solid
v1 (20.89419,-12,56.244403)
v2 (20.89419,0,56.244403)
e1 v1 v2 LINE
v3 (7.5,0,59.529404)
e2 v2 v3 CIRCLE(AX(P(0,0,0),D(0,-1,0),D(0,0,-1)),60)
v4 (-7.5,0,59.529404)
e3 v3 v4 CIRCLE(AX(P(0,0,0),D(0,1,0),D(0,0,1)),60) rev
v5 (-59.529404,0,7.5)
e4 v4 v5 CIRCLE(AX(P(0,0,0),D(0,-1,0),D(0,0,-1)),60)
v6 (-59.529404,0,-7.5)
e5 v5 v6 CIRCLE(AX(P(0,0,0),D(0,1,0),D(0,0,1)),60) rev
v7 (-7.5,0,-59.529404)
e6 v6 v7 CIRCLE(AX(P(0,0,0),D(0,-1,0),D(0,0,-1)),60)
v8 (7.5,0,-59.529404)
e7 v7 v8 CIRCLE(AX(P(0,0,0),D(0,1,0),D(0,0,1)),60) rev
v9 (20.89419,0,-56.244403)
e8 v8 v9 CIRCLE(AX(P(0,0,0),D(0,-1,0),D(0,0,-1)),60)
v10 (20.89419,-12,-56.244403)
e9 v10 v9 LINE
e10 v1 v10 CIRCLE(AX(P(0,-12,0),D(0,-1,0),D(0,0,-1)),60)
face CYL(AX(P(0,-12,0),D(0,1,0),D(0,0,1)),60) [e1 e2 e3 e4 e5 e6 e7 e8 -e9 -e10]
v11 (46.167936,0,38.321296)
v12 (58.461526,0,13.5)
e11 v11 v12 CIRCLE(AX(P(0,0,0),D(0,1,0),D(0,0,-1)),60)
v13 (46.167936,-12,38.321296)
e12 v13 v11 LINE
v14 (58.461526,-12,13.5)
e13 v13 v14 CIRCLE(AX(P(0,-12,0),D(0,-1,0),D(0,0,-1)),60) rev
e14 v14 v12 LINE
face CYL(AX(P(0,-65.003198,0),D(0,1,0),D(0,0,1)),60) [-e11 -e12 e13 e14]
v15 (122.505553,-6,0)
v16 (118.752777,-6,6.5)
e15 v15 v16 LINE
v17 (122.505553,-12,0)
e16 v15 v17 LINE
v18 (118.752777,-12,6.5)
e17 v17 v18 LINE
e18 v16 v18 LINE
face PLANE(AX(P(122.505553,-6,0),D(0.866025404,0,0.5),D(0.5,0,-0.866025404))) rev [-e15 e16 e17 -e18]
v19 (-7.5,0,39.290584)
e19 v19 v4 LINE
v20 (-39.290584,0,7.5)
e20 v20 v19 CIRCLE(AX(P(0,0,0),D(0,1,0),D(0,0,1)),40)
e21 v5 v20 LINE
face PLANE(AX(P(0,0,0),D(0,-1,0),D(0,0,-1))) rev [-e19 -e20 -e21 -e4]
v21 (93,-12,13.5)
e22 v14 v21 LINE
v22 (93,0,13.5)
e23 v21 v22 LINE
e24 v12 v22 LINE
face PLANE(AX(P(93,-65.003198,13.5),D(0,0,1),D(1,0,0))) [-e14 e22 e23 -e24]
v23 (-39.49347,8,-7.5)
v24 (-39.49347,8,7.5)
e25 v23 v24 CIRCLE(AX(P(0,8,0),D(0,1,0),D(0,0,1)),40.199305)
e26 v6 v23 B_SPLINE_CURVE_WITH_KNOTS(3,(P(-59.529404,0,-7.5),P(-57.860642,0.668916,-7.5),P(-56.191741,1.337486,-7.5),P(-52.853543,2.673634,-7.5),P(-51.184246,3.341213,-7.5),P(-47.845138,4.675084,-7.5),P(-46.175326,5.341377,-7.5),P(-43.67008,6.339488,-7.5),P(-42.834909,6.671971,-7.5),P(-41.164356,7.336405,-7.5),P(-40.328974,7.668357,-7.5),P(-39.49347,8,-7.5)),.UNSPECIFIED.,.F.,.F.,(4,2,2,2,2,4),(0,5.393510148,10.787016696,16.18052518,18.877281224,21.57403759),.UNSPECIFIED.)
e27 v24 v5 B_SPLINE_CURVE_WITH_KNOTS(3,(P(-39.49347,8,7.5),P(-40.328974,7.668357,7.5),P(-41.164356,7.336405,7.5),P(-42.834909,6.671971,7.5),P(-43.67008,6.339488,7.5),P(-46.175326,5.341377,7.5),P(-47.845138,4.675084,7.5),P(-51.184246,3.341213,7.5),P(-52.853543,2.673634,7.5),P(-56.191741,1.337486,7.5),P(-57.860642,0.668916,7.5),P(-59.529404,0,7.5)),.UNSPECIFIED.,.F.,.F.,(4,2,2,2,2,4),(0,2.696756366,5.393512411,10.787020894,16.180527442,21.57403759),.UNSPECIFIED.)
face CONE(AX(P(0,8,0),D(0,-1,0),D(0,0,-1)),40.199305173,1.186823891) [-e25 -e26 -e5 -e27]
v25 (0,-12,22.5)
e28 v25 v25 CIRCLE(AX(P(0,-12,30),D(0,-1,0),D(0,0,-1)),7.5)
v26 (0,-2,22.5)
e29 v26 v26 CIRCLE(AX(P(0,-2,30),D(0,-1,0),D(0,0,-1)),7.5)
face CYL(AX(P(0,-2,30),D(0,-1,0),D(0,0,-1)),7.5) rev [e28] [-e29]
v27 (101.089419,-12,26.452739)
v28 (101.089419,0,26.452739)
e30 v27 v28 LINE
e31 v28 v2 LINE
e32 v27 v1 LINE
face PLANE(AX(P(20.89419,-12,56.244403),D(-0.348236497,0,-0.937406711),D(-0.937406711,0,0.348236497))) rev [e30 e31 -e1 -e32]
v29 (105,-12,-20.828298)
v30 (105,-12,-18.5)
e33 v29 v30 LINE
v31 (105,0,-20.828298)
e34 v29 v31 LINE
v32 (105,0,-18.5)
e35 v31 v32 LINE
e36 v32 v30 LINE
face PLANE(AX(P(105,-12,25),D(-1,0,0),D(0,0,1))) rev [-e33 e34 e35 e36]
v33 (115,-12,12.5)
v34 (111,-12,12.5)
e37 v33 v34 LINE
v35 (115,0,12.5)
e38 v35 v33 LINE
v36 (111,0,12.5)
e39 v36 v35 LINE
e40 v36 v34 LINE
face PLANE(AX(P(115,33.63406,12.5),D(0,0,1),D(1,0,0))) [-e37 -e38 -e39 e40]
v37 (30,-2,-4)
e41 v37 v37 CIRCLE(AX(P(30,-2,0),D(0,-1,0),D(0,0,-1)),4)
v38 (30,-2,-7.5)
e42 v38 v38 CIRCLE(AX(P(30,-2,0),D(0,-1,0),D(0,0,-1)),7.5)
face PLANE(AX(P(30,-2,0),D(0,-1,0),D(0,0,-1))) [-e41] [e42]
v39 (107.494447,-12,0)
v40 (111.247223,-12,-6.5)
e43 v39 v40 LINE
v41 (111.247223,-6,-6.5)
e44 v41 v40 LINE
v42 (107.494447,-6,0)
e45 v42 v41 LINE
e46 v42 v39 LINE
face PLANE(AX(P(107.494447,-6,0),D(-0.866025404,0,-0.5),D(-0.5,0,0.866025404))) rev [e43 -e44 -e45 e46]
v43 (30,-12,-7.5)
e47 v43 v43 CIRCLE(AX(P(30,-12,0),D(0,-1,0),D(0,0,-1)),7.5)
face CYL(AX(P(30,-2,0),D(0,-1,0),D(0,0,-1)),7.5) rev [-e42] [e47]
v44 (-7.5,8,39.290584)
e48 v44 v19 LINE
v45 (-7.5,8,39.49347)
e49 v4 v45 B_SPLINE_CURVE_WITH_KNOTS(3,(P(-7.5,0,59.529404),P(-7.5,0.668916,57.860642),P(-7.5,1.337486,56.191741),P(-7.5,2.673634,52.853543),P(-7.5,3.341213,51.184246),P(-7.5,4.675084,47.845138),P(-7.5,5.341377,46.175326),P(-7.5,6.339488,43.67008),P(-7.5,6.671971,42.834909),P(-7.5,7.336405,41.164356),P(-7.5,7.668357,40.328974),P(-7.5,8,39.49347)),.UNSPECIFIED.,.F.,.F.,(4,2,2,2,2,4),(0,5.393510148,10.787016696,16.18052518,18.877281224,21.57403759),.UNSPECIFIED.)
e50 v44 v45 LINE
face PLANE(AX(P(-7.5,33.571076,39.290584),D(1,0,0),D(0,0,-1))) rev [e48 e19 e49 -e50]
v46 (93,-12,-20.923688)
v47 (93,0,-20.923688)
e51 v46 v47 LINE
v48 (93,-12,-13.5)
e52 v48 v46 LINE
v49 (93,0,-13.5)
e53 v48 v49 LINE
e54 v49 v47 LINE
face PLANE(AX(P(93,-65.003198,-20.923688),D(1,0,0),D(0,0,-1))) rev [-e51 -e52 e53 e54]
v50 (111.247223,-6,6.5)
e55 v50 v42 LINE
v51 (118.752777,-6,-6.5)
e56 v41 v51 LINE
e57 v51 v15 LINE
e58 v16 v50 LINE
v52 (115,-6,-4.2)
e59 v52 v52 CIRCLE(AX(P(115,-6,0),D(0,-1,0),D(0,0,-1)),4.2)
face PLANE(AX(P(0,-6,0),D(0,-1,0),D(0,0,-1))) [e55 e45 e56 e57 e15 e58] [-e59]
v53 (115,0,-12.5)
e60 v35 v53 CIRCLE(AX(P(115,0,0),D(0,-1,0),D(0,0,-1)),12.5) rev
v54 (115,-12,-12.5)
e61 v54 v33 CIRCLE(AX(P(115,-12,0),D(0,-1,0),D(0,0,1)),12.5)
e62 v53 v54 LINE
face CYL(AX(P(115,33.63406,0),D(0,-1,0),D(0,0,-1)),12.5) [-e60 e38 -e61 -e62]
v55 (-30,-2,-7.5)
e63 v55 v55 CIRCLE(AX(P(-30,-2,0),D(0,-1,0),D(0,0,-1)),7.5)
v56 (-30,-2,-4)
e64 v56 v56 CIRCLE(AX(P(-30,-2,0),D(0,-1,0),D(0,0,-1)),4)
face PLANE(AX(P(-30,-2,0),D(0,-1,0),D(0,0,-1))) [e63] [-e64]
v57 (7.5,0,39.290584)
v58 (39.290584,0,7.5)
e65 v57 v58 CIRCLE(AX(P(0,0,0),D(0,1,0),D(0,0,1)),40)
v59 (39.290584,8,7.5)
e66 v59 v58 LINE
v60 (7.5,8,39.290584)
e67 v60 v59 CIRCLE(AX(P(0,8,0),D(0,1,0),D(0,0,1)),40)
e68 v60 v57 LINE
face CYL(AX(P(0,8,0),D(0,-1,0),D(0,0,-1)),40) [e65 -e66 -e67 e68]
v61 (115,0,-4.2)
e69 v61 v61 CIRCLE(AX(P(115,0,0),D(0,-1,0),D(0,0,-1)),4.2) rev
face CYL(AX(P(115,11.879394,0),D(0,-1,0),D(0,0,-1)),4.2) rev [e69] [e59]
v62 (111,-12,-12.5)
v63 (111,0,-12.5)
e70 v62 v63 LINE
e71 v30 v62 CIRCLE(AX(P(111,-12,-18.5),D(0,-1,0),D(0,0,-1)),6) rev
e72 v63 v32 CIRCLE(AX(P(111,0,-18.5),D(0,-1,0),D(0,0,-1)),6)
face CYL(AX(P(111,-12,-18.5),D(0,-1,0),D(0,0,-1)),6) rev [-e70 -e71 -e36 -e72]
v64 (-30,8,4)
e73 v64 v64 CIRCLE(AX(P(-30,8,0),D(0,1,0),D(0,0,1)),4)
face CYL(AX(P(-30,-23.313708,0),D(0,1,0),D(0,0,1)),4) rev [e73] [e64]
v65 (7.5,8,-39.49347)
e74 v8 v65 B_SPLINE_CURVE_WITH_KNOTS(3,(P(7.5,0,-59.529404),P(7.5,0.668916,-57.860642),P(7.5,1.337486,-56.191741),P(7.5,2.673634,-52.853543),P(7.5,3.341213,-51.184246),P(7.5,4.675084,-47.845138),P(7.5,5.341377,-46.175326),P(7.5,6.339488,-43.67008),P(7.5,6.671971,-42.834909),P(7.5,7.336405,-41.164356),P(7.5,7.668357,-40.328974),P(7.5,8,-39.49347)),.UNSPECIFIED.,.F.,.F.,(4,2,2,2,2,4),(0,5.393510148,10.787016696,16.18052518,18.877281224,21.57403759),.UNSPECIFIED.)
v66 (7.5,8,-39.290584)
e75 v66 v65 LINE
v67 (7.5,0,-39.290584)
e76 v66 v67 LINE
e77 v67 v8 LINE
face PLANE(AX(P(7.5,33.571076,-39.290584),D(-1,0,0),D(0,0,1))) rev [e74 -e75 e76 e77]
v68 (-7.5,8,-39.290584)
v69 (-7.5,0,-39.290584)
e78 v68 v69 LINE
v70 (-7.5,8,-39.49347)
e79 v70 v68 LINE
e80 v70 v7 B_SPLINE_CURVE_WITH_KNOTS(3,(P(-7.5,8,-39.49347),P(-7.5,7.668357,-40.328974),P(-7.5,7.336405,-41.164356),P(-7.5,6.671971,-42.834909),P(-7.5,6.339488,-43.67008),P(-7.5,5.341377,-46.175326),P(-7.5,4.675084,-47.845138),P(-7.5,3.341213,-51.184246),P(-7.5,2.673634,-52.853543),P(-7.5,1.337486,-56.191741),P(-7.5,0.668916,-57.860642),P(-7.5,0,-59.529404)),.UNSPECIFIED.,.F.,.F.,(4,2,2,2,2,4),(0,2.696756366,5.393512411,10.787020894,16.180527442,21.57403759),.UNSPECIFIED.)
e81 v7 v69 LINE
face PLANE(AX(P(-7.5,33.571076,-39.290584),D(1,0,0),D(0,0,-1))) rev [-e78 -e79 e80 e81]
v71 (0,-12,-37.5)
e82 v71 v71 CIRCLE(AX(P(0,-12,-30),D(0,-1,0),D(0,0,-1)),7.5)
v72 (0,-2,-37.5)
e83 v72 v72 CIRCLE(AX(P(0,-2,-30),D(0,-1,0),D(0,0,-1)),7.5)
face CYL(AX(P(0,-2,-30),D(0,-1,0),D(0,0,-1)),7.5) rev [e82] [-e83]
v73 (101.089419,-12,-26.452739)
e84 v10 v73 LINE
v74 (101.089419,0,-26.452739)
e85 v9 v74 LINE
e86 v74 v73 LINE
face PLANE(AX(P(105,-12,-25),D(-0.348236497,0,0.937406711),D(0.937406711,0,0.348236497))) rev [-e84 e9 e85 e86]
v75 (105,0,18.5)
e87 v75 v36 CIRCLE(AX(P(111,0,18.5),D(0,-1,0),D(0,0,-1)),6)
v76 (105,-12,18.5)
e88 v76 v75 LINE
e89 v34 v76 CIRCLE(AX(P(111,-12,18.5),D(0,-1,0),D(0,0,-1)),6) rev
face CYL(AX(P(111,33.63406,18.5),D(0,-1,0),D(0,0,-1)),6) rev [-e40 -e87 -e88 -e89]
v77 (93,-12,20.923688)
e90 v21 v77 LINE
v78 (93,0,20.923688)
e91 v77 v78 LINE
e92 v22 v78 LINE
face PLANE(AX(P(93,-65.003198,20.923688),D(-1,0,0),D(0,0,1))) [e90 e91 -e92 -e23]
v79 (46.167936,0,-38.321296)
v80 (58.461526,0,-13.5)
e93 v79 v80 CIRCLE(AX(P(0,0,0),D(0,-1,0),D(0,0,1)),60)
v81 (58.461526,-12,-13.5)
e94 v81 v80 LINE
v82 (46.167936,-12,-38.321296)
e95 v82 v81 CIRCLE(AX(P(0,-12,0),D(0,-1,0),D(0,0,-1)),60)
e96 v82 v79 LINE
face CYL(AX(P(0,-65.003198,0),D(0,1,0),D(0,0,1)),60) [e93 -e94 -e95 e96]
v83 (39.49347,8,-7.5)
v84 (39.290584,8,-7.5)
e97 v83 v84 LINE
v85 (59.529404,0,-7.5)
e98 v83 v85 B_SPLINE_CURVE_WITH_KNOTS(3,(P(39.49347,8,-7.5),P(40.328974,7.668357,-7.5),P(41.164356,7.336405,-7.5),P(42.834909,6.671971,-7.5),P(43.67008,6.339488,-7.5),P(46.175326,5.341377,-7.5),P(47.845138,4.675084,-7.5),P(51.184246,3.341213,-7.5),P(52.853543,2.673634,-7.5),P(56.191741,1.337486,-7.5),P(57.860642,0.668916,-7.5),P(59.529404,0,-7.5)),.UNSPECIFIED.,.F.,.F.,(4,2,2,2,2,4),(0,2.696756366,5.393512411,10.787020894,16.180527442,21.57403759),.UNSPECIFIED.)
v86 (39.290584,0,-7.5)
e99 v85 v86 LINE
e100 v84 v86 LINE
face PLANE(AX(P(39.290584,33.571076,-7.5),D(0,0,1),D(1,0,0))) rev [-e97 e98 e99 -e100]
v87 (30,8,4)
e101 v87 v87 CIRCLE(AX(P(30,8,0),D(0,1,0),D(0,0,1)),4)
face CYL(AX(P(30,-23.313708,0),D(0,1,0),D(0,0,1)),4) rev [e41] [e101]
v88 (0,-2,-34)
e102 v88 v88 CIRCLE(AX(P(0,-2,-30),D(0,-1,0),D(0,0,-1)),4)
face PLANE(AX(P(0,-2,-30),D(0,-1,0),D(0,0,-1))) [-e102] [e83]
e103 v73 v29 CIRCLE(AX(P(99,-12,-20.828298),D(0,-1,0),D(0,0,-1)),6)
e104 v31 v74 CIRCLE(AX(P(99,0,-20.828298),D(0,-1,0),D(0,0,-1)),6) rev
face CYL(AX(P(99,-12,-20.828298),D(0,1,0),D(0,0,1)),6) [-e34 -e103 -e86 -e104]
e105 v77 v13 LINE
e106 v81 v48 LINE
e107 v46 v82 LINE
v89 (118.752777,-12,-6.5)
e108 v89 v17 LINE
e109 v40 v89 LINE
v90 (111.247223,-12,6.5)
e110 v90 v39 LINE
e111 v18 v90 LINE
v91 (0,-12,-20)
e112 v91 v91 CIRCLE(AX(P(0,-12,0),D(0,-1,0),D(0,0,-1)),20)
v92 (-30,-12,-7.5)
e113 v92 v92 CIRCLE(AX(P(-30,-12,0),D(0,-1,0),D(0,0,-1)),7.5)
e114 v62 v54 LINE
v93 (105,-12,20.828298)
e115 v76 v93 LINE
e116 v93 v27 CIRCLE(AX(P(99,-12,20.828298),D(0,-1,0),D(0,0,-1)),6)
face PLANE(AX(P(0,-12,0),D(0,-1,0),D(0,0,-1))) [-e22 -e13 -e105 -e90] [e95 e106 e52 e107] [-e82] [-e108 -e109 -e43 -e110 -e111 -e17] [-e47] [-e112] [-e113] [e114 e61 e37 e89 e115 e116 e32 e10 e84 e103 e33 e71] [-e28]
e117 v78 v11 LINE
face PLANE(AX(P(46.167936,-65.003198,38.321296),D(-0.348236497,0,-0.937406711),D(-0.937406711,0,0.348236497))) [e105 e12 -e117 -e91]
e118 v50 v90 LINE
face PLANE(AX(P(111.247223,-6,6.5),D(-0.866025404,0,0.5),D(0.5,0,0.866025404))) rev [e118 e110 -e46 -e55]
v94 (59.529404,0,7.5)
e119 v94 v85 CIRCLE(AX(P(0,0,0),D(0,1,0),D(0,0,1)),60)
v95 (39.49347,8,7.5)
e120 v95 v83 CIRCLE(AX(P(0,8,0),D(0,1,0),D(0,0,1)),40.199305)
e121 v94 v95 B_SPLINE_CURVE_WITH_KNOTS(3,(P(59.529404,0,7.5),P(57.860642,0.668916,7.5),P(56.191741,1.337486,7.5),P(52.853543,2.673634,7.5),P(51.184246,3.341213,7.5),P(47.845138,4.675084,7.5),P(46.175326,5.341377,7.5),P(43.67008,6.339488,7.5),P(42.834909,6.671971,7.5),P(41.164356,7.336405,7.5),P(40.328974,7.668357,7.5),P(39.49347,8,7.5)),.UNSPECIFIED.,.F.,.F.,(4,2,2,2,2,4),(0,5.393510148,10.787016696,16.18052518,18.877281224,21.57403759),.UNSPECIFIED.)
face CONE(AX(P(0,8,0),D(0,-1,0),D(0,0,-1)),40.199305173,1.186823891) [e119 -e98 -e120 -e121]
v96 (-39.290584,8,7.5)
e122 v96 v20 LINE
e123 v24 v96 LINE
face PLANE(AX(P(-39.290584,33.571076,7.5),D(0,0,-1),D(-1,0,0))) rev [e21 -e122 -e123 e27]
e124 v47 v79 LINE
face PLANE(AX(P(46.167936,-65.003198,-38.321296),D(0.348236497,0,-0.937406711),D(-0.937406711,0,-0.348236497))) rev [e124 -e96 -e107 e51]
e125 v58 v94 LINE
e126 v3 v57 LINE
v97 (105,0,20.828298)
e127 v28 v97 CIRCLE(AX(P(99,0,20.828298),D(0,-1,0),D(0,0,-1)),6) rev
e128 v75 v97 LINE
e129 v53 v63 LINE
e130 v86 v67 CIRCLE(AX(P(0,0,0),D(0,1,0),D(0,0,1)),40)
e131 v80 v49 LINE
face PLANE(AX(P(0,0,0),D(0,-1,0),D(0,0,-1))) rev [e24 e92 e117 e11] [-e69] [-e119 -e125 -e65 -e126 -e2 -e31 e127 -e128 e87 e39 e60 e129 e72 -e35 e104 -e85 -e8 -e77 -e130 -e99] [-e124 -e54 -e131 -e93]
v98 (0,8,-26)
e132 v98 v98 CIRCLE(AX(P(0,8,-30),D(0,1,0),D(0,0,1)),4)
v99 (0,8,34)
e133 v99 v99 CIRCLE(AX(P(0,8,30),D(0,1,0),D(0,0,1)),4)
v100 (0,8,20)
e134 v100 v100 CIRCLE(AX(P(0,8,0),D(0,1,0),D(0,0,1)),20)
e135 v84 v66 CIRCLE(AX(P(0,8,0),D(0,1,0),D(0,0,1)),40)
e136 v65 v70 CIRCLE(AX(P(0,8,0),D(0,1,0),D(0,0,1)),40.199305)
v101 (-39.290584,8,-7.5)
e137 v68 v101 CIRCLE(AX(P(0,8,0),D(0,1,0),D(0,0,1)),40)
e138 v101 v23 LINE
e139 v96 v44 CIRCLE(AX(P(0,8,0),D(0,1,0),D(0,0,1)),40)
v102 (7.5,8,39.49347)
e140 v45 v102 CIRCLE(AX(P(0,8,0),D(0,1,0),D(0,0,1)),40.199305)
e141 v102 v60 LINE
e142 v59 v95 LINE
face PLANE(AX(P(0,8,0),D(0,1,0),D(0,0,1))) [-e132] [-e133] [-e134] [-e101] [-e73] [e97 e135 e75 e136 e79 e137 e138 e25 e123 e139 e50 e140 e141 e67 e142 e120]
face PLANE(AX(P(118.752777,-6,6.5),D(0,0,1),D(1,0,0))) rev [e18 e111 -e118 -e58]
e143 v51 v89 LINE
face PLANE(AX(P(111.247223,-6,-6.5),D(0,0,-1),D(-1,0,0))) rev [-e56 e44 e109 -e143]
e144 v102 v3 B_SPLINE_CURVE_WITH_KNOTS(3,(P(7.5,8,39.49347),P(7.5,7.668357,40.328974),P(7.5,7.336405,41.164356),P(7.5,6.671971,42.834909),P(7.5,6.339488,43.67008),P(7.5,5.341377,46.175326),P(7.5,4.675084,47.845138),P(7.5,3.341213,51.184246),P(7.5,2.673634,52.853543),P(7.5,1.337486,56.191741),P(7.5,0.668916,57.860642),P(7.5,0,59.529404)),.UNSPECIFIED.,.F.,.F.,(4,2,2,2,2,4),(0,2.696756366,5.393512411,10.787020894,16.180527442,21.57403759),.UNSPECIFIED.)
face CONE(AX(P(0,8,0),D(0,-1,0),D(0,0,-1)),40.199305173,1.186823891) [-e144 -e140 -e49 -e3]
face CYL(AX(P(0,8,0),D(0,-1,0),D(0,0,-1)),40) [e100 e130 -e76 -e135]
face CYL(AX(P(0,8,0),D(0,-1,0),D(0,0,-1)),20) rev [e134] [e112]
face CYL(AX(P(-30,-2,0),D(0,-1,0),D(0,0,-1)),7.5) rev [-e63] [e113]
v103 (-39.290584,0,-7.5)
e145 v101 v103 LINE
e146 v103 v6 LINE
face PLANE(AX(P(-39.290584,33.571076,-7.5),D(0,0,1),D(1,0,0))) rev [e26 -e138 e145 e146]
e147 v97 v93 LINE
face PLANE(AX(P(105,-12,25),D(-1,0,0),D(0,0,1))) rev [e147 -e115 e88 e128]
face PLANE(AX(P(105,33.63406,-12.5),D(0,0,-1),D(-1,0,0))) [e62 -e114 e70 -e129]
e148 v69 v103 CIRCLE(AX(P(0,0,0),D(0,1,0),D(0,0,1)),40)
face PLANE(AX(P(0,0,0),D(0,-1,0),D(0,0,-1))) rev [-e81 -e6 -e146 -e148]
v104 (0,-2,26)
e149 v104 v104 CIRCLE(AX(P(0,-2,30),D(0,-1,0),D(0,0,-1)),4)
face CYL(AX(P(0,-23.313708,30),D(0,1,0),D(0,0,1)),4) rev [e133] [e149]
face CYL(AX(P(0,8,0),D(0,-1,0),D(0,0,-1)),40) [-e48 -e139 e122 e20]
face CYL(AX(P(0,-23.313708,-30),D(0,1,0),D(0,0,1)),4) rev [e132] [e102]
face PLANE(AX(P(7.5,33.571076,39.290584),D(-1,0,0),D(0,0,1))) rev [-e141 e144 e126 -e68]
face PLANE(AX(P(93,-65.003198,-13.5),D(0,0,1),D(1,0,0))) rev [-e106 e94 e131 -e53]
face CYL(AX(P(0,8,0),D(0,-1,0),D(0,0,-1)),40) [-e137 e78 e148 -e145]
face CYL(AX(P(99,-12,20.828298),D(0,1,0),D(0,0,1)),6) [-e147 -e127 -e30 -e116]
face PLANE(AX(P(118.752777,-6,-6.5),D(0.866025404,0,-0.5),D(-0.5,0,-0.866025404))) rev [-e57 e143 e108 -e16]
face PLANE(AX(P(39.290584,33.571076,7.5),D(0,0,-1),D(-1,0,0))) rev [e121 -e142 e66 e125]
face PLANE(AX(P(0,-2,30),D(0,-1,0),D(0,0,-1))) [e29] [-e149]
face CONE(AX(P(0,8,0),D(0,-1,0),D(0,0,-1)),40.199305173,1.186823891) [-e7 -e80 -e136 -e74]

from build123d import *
from OCP.BRepFilletAPI import BRepFilletAPI_MakeChamfer
from build123d.topology import SkipClean

# Parameters (mm, degrees)
SKETCH1_R           = 40
SKETCH1_R_2         = 20
BOSS_EXTRUDE1_DEPTH = 8
BOSS_EXTRUDE2_START = 12
SKETCH3_R           = 20
BOSS_EXTRUDE2_DEPTH = 12
SKETCH5_R           = 7.5
CUT_EXTRUDE3_DEPTH  = 10
SKETCH2_R           = 4
CUT_EXTRUDE1_DEPTH  = 20
BOSS_EXTRUDE3_DEPTH = 8
CHAMFER1_SIZE       = 19.800694827
CHAMFER1_SIZE_2     = 8
BOSS_EXTRUDE4_DEPTH = 12
FILLET1_R           = 6
CUT_EXTRUDE4_DEPTH  = 6
SKETCH9_R           = 4.2
CUT_EXTRUDE5_DEPTH  = 6
CUT_EXTRUDE7_START  = -12
CUT_EXTRUDE7_DEPTH  = 12


with BuildPart() as part:
    # Sketch1 → Boss-Extrude1 (new body)
    with BuildSketch(Plane(origin=(0, 0, 0), x_dir=(1, 0, 0), z_dir=(0, 1, 0))):
        with Locations(Location((0, 0, 0), (0, 0, 270))):
            Circle(SKETCH1_R)
        with Locations(Location((0, 0, 0), (0, 0, 270))):
            Circle(SKETCH1_R_2, mode=Mode.SUBTRACT)
    extrude(amount=BOSS_EXTRUDE1_DEPTH)

    # Sketch3 → Boss-Extrude2 (add)
    with SkipClean():  # the faces are left unmerged after this step: merging them gives an invalid solid
        with BuildSketch(Plane.XZ.offset(BOSS_EXTRUDE2_START)):
            with BuildLine():
                Line((20.894189842, 56.244402662), (105, 25))
                Line((105, 25), (105, -25))
                Line((105, -25), (20.894189842, -56.244402662))
                ThreePointArc((20.894189842, -56.244402662), (-60, 0), (20.894189842, 56.244402662))
            make_face()
            with Locations(Location((0, 0, 0), (0, 0, 270))):
                Circle(SKETCH3_R, mode=Mode.SUBTRACT)
        extrude(amount=-BOSS_EXTRUDE2_DEPTH)

    # Sketch5 → Cut-Extrude3 (cut)
    with SkipClean():  # the faces are left unmerged after this step: merging them gives an invalid solid
        with BuildSketch(Plane.XZ.offset(12)):
            with Locations(Location((0, 30, 0), (0, 0, 270))):
                Circle(SKETCH5_R)
            with Locations(Location((30, 0, 0), (0, 0, 270))):
                Circle(SKETCH5_R)
            with Locations(Location((0, -30, 0), (0, 0, 270))):
                Circle(SKETCH5_R)
            with Locations(Location((-30, 0, 0), (0, 0, 270))):
                Circle(SKETCH5_R)
        extrude(amount=-CUT_EXTRUDE3_DEPTH, mode=Mode.SUBTRACT)

    # Sketch2 → Cut-Extrude1 (cut)
    with SkipClean():  # the faces are left unmerged after this step: merging them gives an invalid solid
        with BuildSketch(Plane(origin=(0, 8, 0), x_dir=(1, 0, 0), z_dir=(0, 1, 0))):
            with Locations(Location((30, 0, 0), (0, 0, 270))):
                Circle(SKETCH2_R)
            with Locations(Location((0, -30, 0), (0, 0, 270))):
                Circle(SKETCH2_R)
            with Locations(Location((-30, 0, 0), (0, 0, 270))):
                Circle(SKETCH2_R)
            with Locations(Location((0, 30, 0), (0, 0, 270))):
                Circle(SKETCH2_R)
        extrude(amount=-CUT_EXTRUDE1_DEPTH, mode=Mode.SUBTRACT)

    # Sketch6 → Boss-Extrude3 (add)
    with SkipClean():  # the faces are left unmerged after this step: merging them gives an invalid solid
        with BuildSketch(Plane(origin=(0, 0, 0), x_dir=(1, 0, 0), z_dir=(0, 1, 0))):
            with BuildLine():
                Line((-7.5, -39.290584114), (-7.5, -59.529404499))
                ThreePointArc((-7.5, -59.529404499), (0, -60), (7.5, -59.529404499))
                Line((7.5, -59.529404499), (7.5, -39.290584114))
                ThreePointArc((7.5, -39.290584114), (0, -40), (-7.5, -39.290584114))
            make_face()
            with BuildLine():
                Line((-39.290584114, -7.5), (-59.529404499, -7.5))
                ThreePointArc((-59.529404499, -7.5), (-60, 0), (-59.529404499, 7.5))
                Line((-59.529404499, 7.5), (-39.290584114, 7.5))
                ThreePointArc((-39.290584114, 7.5), (-40, 0), (-39.290584114, -7.5))
            make_face()
            with BuildLine():
                Line((-7.5, 39.290584114), (-7.5, 59.529404499))
                ThreePointArc((-7.5, 59.529404499), (0, 60), (7.5, 59.529404499))
                Line((7.5, 59.529404499), (7.5, 39.290584114))
                ThreePointArc((7.5, 39.290584114), (0, 40), (-7.5, 39.290584114))
            make_face()
            with BuildLine():
                Line((39.290584114, 7.5), (59.529404499, 7.5))
                ThreePointArc((59.529404499, 7.5), (60, 0), (59.529404499, -7.5))
                Line((59.529404499, -7.5), (39.290584114, -7.5))
                ThreePointArc((39.290584114, -7.5), (40, 0), (39.290584114, 7.5))
            make_face()
        extrude(amount=BOSS_EXTRUDE3_DEPTH)

    # Chamfer1
    chamfer1_edges_1 = [part.edges().sort_by_distance(p)[0] for p in [
        (0, 8, -60),
    ]]
    chamfer1_side_1 = [part.faces().sort_by_distance(p)[0] for p in [
        (0, 8, -59.84),
    ]]
    chamfer1_edges_2 = [part.edges().sort_by_distance(p)[0] for p in [
        (60, 8, 0),
    ]]
    chamfer1_side_2 = [part.faces().sort_by_distance(p)[0] for p in [
        (60, 7.84, 0),
    ]]
    chamfer1_edges_3 = [part.edges().sort_by_distance(p)[0] for p in [
        (0, 8, 60),
    ]]
    chamfer1_side_3 = [part.faces().sort_by_distance(p)[0] for p in [
        (0, 8, 59.84),
    ]]
    chamfer1_edges_4 = [part.edges().sort_by_distance(p)[0] for p in [
        (-60, 8, 0),
    ]]
    chamfer1_side_4 = [part.faces().sort_by_distance(p)[0] for p in [
        (-59.84, 8, 0),
    ]]
    chamfer1 = BRepFilletAPI_MakeChamfer(part.part.solid().wrapped)
    for e in chamfer1_edges_1:
        chamfer1.Add(CHAMFER1_SIZE - 0.0001, CHAMFER1_SIZE_2 - 0.0001, e.wrapped, chamfer1_side_1[0].wrapped)
    for e in chamfer1_edges_2:
        chamfer1.Add(CHAMFER1_SIZE_2 - 0.0001, CHAMFER1_SIZE - 0.0001, e.wrapped, chamfer1_side_2[0].wrapped)
    for e in chamfer1_edges_3:
        chamfer1.Add(CHAMFER1_SIZE - 0.0001, CHAMFER1_SIZE_2 - 0.0001, e.wrapped, chamfer1_side_3[0].wrapped)
    for e in chamfer1_edges_4:
        chamfer1.Add(CHAMFER1_SIZE - 0.0001, CHAMFER1_SIZE_2 - 0.0001, e.wrapped, chamfer1_side_4[0].wrapped)
    add(Compound.cast(chamfer1.Shape()), mode=Mode.REPLACE)  # a hair under: the kernel refuses the full size

    # Sketch7 → Boss-Extrude4 (add)
    with BuildSketch(Plane.XZ.offset(12)):
        with BuildLine():
            Line((115, 12.5), (105, 12.5))
            Line((105, 12.5), (105, -12.5))
            Line((105, -12.5), (115, -12.5))
            ThreePointArc((115, -12.5), (127.5, 0), (115, 12.5))
        make_face()
    extrude(amount=-BOSS_EXTRUDE4_DEPTH)

    # Fillet1
    fillet1_edges = [part.edges().sort_by_distance(p)[0] for p in [
        (105, -6, -25),
        (105, -6, 25),
        (105, -6, -12.5),
        (105, -6, 12.5),
    ]]
    fillet(fillet1_edges, radius=FILLET1_R)

    # Sketch8 → Cut-Extrude4 (cut)
    with BuildSketch(Plane.XZ.offset(12)):
        Polygon((111.24722325, -6.5), (118.75277675, -6.5), (122.505553499, 0), (118.75277675, 6.5), (111.24722325, 6.5), (107.494446501, 0), align=None)
    extrude(amount=-CUT_EXTRUDE4_DEPTH, mode=Mode.SUBTRACT)

    # Sketch9 → Cut-Extrude5 (cut)
    with BuildSketch(Plane.XZ.offset(6)):
        with Locations(Location((115, 0, 0), (0, 0, 270))):
            Circle(SKETCH9_R)
    extrude(amount=-CUT_EXTRUDE5_DEPTH, mode=Mode.SUBTRACT)

    # Sketch11 → Cut-Extrude7 (cut)
    with BuildSketch(Plane(origin=(0, 0, 0), x_dir=(1, 0, 0), z_dir=(0, 1, 0)).offset(CUT_EXTRUDE7_START)):
        with BuildLine():
            Line((93, 20.923688206), (93, 13.5))
            Line((93, 13.5), (58.46152581, 13.5))
            ThreePointArc((58.46152581, 13.5), (53.766674065, 26.62977206), (46.167935821, 38.321295672))
            Line((46.167935821, 38.321295672), (93, 20.923688206))
        make_face()
    cut_extrude7 = extrude(amount=CUT_EXTRUDE7_DEPTH, mode=Mode.SUBTRACT)

    # Mirror1: Cut-Extrude7 across plane
    add(cut_extrude7.mirror(Plane.XY), mode=Mode.SUBTRACT)


solid = part.part
